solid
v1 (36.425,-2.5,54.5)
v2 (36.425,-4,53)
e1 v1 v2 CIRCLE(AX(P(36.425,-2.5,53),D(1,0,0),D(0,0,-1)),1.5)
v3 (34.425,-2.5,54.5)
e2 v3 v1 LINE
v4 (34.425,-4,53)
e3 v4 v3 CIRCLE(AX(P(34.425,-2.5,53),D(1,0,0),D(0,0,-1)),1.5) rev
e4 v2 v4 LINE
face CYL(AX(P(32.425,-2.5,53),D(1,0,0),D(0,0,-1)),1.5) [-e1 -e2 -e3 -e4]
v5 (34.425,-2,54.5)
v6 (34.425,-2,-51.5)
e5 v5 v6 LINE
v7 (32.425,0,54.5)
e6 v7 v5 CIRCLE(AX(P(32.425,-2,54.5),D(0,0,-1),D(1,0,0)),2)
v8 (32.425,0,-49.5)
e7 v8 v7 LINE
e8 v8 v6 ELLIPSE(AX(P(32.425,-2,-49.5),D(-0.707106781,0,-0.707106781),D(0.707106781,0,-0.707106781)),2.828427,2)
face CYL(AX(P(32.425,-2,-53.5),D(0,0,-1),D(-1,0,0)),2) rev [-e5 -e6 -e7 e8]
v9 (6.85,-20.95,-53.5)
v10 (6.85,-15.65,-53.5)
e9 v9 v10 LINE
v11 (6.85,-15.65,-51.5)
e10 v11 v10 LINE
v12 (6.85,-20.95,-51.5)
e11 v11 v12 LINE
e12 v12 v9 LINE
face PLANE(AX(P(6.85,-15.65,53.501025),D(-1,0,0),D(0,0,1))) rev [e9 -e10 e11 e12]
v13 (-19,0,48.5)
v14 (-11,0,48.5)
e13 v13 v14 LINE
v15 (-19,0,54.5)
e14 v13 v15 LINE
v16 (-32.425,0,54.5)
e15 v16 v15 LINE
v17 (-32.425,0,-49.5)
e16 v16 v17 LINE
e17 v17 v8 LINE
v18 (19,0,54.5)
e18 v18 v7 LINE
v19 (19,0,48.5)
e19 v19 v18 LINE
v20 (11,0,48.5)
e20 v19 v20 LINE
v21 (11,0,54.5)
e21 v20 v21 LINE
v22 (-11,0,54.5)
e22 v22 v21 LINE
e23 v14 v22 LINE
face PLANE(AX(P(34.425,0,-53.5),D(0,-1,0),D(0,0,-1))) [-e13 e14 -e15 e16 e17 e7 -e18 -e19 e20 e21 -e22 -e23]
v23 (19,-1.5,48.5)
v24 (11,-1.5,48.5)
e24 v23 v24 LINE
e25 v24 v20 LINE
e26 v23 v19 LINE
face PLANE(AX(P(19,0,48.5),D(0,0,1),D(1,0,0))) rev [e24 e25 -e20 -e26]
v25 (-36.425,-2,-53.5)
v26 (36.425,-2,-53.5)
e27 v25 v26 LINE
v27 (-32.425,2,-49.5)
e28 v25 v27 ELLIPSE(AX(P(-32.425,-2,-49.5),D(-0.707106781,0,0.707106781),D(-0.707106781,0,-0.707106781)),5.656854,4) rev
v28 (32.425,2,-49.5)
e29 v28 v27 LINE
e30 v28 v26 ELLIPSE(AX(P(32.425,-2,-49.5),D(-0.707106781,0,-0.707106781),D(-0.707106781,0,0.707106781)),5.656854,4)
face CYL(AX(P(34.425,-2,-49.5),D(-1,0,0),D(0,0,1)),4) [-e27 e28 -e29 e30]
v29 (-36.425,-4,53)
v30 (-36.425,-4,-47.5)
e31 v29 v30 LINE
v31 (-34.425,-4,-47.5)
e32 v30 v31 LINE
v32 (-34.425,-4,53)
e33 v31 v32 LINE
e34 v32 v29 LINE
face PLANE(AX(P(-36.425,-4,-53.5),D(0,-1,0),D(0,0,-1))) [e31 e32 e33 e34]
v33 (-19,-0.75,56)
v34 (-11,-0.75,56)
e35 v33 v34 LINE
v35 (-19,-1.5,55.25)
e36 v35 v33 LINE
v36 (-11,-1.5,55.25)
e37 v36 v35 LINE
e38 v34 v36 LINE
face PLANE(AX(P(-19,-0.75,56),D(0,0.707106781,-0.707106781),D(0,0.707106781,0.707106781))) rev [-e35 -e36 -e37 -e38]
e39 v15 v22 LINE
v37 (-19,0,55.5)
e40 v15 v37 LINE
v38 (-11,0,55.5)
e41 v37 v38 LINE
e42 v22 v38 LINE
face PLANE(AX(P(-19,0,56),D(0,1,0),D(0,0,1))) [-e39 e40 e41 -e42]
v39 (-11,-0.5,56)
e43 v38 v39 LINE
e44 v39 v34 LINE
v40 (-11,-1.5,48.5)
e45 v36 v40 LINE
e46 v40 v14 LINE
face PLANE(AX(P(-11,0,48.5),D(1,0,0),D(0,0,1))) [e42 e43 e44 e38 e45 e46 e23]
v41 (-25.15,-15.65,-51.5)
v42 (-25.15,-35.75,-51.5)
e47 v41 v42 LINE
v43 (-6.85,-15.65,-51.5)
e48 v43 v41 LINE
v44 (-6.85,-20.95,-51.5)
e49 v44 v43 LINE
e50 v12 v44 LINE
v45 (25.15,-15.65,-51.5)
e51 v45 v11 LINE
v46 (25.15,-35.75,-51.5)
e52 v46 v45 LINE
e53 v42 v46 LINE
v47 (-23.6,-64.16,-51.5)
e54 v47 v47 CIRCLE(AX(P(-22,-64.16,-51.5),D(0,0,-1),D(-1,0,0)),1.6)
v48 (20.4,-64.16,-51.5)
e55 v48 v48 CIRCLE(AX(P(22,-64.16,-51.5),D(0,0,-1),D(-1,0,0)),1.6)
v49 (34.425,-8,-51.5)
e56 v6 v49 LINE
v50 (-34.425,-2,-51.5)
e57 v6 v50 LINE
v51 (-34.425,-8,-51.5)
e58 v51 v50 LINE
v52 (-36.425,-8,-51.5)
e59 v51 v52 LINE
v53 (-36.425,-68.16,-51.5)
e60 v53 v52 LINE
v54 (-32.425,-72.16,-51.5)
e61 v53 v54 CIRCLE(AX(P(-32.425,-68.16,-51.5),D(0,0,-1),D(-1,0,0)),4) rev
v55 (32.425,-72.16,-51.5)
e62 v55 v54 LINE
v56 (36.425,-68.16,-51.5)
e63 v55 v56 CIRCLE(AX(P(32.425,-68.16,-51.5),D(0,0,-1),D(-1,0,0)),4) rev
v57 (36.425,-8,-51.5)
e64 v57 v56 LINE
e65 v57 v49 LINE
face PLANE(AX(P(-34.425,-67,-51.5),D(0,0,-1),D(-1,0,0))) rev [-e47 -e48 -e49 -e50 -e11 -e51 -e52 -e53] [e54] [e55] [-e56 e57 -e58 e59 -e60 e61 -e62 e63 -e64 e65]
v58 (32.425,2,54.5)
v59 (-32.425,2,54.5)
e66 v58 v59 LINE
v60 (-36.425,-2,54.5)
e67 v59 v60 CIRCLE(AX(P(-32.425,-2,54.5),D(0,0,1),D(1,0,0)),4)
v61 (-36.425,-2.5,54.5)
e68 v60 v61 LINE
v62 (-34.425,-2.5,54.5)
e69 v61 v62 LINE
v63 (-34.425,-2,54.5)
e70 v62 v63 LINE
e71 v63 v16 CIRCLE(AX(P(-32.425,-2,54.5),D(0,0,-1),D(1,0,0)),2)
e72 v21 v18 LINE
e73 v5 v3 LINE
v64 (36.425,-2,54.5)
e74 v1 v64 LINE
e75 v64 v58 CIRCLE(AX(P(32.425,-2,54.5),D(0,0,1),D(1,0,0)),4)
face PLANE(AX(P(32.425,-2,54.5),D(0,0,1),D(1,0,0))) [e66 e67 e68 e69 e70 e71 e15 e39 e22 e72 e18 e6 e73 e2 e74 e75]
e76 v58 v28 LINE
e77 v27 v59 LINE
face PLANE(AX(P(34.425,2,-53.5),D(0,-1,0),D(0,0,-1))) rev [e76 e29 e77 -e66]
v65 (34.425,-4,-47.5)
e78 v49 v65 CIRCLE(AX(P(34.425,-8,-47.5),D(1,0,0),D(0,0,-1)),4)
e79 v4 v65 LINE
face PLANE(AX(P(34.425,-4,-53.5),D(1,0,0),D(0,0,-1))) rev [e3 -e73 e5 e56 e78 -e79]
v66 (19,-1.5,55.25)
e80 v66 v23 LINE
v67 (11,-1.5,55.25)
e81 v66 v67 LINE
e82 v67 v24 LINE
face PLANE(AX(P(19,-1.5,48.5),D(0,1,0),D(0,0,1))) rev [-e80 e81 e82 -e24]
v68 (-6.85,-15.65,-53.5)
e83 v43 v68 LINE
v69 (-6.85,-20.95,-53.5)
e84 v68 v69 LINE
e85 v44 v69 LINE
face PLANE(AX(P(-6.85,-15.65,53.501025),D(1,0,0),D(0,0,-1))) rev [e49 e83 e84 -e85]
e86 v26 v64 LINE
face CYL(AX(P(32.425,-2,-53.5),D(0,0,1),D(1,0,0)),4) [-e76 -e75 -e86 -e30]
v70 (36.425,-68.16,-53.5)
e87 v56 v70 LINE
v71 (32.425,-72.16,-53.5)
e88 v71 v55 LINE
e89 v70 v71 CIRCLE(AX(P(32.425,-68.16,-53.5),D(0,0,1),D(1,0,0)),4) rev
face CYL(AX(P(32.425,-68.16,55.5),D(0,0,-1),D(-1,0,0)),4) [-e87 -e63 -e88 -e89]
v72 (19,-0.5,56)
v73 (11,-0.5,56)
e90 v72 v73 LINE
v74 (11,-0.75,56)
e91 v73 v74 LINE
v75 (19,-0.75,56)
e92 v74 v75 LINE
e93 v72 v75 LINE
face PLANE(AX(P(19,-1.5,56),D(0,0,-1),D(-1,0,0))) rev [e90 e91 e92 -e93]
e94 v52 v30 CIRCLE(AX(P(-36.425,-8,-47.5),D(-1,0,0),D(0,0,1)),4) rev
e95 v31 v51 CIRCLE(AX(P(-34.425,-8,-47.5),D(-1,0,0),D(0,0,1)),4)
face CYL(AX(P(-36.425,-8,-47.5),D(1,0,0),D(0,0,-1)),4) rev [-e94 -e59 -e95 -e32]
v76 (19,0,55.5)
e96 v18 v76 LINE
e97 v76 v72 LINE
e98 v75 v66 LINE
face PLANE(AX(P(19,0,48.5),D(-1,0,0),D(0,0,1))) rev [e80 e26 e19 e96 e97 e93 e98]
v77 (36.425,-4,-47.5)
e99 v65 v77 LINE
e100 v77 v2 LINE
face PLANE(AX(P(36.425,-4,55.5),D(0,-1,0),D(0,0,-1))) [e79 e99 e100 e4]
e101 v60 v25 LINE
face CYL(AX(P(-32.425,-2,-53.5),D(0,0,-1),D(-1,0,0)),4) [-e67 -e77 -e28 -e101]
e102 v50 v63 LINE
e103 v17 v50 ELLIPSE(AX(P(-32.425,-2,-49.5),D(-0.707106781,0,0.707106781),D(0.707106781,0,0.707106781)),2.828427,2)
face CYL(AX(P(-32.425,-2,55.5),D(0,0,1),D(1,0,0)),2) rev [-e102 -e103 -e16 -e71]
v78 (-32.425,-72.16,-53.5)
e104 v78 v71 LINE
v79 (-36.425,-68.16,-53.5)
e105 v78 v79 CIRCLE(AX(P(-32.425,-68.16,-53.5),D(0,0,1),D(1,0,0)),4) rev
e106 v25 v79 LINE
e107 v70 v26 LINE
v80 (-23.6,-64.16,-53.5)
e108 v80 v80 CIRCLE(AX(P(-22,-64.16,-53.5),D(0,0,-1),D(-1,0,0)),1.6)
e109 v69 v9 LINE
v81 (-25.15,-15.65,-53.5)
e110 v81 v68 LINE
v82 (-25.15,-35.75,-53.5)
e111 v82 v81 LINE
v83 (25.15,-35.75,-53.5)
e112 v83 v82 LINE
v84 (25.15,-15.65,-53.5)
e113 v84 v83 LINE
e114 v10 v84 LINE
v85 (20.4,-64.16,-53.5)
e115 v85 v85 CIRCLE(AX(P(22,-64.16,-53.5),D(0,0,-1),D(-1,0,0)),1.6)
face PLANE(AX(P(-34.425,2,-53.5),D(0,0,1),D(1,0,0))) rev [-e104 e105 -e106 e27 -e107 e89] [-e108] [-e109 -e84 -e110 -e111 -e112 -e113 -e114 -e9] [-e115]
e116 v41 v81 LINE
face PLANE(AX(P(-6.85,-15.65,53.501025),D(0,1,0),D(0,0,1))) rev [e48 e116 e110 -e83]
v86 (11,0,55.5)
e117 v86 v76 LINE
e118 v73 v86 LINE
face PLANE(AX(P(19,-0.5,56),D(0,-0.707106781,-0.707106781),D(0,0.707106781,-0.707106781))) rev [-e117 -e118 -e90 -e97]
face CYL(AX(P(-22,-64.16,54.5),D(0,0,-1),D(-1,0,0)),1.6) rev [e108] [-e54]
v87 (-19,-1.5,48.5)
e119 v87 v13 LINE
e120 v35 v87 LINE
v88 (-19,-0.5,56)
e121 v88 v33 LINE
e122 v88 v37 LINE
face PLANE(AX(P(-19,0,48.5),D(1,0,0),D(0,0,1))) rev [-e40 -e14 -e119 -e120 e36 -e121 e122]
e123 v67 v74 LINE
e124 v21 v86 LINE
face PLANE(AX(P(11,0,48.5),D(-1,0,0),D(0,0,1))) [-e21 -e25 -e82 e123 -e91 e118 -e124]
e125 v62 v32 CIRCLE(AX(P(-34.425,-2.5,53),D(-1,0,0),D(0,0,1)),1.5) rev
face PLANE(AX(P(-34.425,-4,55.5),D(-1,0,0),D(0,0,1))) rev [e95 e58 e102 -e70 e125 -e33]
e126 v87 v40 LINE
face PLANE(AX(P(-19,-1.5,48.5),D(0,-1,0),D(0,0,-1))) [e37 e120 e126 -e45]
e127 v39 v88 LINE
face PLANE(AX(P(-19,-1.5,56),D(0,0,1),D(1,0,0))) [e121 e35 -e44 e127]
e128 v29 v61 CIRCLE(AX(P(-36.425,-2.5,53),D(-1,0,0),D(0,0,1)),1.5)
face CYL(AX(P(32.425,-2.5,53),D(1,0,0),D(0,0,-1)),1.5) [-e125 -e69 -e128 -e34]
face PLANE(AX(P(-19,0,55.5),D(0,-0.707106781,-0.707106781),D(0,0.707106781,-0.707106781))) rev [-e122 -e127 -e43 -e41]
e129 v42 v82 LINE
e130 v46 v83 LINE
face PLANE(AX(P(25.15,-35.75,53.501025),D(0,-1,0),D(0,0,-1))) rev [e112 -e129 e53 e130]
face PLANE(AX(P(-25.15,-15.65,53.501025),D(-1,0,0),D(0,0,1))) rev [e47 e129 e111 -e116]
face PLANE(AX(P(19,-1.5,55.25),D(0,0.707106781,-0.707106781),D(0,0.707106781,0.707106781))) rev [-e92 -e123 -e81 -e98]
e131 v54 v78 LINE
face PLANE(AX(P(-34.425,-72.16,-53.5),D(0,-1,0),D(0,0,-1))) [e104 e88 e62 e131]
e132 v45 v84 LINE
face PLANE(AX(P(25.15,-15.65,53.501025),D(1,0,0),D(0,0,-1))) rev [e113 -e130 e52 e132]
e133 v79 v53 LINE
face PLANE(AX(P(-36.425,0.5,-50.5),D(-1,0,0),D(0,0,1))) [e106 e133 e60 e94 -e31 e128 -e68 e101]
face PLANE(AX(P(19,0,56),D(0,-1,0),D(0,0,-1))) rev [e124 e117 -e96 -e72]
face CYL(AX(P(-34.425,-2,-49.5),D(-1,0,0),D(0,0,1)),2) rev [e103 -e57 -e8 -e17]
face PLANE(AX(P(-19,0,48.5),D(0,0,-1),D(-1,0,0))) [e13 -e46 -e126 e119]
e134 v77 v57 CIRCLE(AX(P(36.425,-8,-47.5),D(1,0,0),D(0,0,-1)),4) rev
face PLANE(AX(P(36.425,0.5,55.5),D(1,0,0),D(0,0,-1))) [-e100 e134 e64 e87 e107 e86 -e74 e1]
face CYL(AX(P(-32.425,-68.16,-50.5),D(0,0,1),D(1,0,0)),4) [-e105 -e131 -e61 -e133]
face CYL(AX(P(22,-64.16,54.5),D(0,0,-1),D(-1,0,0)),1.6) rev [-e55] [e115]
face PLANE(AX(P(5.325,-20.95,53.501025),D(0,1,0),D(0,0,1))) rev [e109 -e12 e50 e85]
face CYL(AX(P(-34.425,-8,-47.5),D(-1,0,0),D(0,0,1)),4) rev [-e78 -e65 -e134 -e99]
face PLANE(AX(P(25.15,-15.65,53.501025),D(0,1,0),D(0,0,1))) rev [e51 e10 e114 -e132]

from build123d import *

# Parameters (mm, degrees)
SKETCH1_W                = 68.85
SKETCH1_H                = 107
BOSS_EXTRUDE1_DEPTH      = 2
SKETCH2_W                = 68.85
SKETCH2_H                = 2
BOSS_EXTRUDE2_DEPTH      = 67
CUT_EXTRUDE2_REACH       = 132.855
SKETCH5_W                = 68.85
SKETCH5_H                = 2
BOSS_EXTRUDE3_DEPTH      = 51
SKETCH6_W                = 68.85
SKETCH6_H                = 2
BOSS_EXTRUDE4_DEPTH      = 20.36
BOSS_EXTRUDE5_DEPTH      = 1.5
SKETCH13_W               = 2
SKETCH13_H               = 1.5
BOSS_EXTRUDE8_DEPTH      = 3
CUT_EXTRUDE4_REACH       = 97.75
SKETCH9_R                = 1.75
FILLET1_R                = 1.5
FILLET2_R                = 3
FILLET3_R                = 1.5
FILLET4_R                = 3
CUT_EXTRUDE5_REACH       = 111.975
SKETCH10_R               = 1.75
CHAMFER1_SIZE            = 2
SKETCH11_W               = 2
SKETCH11_H               = 109
BOSS_EXTRUDE6_DEPTH      = 4.5
SKETCH14_W               = 68.85
SKETCH14_H               = 0.5
BOSS_EXTRUDE9_DEPTH      = 2
FILLET5_R                = 2
FILLET6_R                = 4
FILLET8_R                = 4
CUT_EXTRUDE6_DEPTH       = 1
CUT_EXTRUDE7_DEPTH       = 125.986967721
SKETCH17_W               = 68.85
SKETCH17_H               = 2
BOSS_EXTRUDE10_DEPTH     = 8.66
SKETCH18_W               = 2
SKETCH18_H               = 68.16
BOSS_EXTRUDE11_DEPTH     = 2
SKETCH19_W               = 2
SKETCH19_H               = 68.16
BOSS_EXTRUDE12_DEPTH     = 2
FILLET9_R                = 4
FILLET10_R               = 4
FILLET11_R               = 1.5
BOSS_EXTRUDE13_START     = -2
BOSS_EXTRUDE13_OUTLINE_R = 1.6
BOSS_EXTRUDE13_DEPTH     = 2
BOSS_EXTRUDE14_START     = 15
SKETCH21_W               = 7.5
SKETCH21_H               = 1.5
BOSS_EXTRUDE14_DEPTH     = 4
CHAMFER2_SIZE            = 0.5
CHAMFER3_SIZE            = 0.75


# Read off the part's stored shape, not the designer's step: Boss-Extrude13
with BuildPart() as part:
    # Sketch1 → Boss-Extrude1 (new body)
    with BuildSketch(Plane(origin=(0, 0, 0), x_dir=(1, 0, 0), z_dir=(0, 1, 0))):
        Rectangle(SKETCH1_W, SKETCH1_H)
    extrude(amount=BOSS_EXTRUDE1_DEPTH)

    # Sketch2 → Boss-Extrude2 (add)
    with BuildSketch(Plane.XZ):
        with Locations((0, -52.5)):
            Rectangle(SKETCH2_W, SKETCH2_H)
    extrude(amount=BOSS_EXTRUDE2_DEPTH)

    # Sketch4 → Cut-Extrude2 (cut, up to next)
    with BuildSketch(Plane(origin=(0, 0, -53.5), x_dir=(-1, 0, 0), z_dir=(0, 0, -1)), mode=Mode.PRIVATE) as cut_extrude2_sk1:
        Polygon((-6.85, -15.65), (-6.85, -20.95), (-5.325, -20.95), (6.85, -20.95), (6.85, -15.65), (25.15, -15.65), (25.15, -35.75), (-25.15, -35.75), (-25.15, -15.65), align=None)
    cut_extrude2_tool1 = extrude(cut_extrude2_sk1.sketch, amount=-CUT_EXTRUDE2_REACH, mode=Mode.PRIVATE) & part.part
    add(cut_extrude2_tool1.solids().sort_by_distance((0, -26.272573, -53.5))[0], mode=Mode.SUBTRACT)

    # Sketch5 → Boss-Extrude3 (add)
    with BuildSketch(Plane.XY.offset(-51.5)):
        with Locations((0, -66)):
            Rectangle(SKETCH5_W, SKETCH5_H)
    extrude(amount=BOSS_EXTRUDE3_DEPTH)

    # Sketch6 → Boss-Extrude4 (add)
    with BuildSketch(Plane.XZ.offset(67)):
        with Locations((0, -1.5)):
            Rectangle(SKETCH6_W, SKETCH6_H)
    extrude(amount=BOSS_EXTRUDE4_DEPTH)

    # Sketch8 → Boss-Extrude5 (add)
    with BuildSketch(Plane(origin=(0, 2, 0), x_dir=(1, 0, 0), z_dir=(0, 1, 0))):
        Polygon((-36.425, 50.5), (-34.425, 50.5), (-34.425, -53.5), (34.425, -53.5), (34.425, 50.5), (36.425, 50.5), (36.425, -55.5), (-36.425, -55.5), align=None)
    extrude(amount=-BOSS_EXTRUDE5_DEPTH)

    # Sketch13 → Boss-Extrude8 (add)
    with BuildSketch(Plane(origin=(0, 0, -50.5), x_dir=(-1, 0, 0), z_dir=(0, 0, -1))):
        with Locations((35.425, 1.25)):
            Rectangle(SKETCH13_W, SKETCH13_H)
        with Locations((-35.425, 1.25)):
            Rectangle(SKETCH13_W, SKETCH13_H)
    extrude(amount=BOSS_EXTRUDE8_DEPTH)

    # Sketch9 → Cut-Extrude4 (cut, up to next)
    with BuildSketch(Plane.XZ.offset(67), mode=Mode.PRIVATE) as cut_extrude4_sk1:
        with Locations(Location((-25, -23.48, 0), (0, 0, 270))):
            Circle(SKETCH9_R)
    cut_extrude4_tool1 = extrude(cut_extrude4_sk1.sketch, amount=-CUT_EXTRUDE4_REACH, mode=Mode.PRIVATE) & part.part
    # Sketch9 → Cut-Extrude4 (cut, up to next)
    with BuildSketch(Plane.XZ.offset(67), mode=Mode.PRIVATE) as cut_extrude4_sk2:
        with Locations(Location((25, -23.48, 0), (0, 0, 270))):
            Circle(SKETCH9_R)
    cut_extrude4_tool2 = extrude(cut_extrude4_sk2.sketch, amount=-CUT_EXTRUDE4_REACH, mode=Mode.PRIVATE) & part.part
    add(cut_extrude4_tool1.solids().sort_by_distance((-25, -67, -23.48))[0], mode=Mode.SUBTRACT)
    add(cut_extrude4_tool2.solids().sort_by_distance((25, -67, -23.48))[0], mode=Mode.SUBTRACT)

    # Fillet1
    fillet1_edges = [part.edges().sort_by_distance(p)[0] for p in [
        (0, -67, -2.5),
    ]]
    fillet(fillet1_edges, radius=FILLET1_R)

    # Fillet2
    fillet2_edges = [part.edges().sort_by_distance(p)[0] for p in [
        (0, -65, -0.5),
    ]]
    fillet(fillet2_edges, radius=FILLET2_R)

    # Fillet3
    fillet3_edges = [part.edges().sort_by_distance(p)[0] for p in [
        (0, -65, -51.5),
    ]]
    fillet(fillet3_edges, radius=FILLET3_R)

    # Fillet4
    fillet4_edges = [part.edges().sort_by_distance(p)[0] for p in [
        (0, -67, -53.5),
    ]]
    fillet(fillet4_edges, radius=FILLET4_R)

    # Sketch10 → Cut-Extrude5 (cut, up to next)
    with BuildSketch(Plane.XY.offset(-0.5), mode=Mode.PRIVATE) as cut_extrude5_sk1:
        with Locations((-24.425, -79.36)):
            Circle(SKETCH10_R)
    cut_extrude5_tool1 = extrude(cut_extrude5_sk1.sketch, amount=-CUT_EXTRUDE5_REACH, mode=Mode.PRIVATE) & part.part
    # Sketch10 → Cut-Extrude5 (cut, up to next)
    with BuildSketch(Plane.XY.offset(-0.5), mode=Mode.PRIVATE) as cut_extrude5_sk2:
        with Locations((24.425, -79.36)):
            Circle(SKETCH10_R)
    cut_extrude5_tool2 = extrude(cut_extrude5_sk2.sketch, amount=-CUT_EXTRUDE5_REACH, mode=Mode.PRIVATE) & part.part
    add(cut_extrude5_tool1.solids().sort_by_distance((-24.425, -79.36, -0.5))[0], mode=Mode.SUBTRACT)
    add(cut_extrude5_tool2.solids().sort_by_distance((24.425, -79.36, -0.5))[0], mode=Mode.SUBTRACT)

    # Chamfer1
    chamfer1_edges = [part.edges().sort_by_distance(p)[0] for p in [
        (-34.425, -87.36, -1.5),
        (34.425, -87.36, -1.5),
    ]]
    chamfer(chamfer1_edges, length=CHAMFER1_SIZE)

    # Sketch11 → Boss-Extrude6 (add)
    with BuildSketch(Plane.XZ.offset(-0.5)):
        with Locations((35.425, 1)):
            Rectangle(SKETCH11_W, SKETCH11_H)
        with Locations((-35.425, 1)):
            Rectangle(SKETCH11_W, SKETCH11_H)
    extrude(amount=BOSS_EXTRUDE6_DEPTH)

    # Sketch14 → Boss-Extrude9 (add)
    with BuildSketch(Plane.XY.offset(53.5)):
        with Locations((0, 0.25)):
            Rectangle(SKETCH14_W, SKETCH14_H)
    extrude(amount=BOSS_EXTRUDE9_DEPTH)

    # Fillet5
    fillet5_edges = [part.edges().sort_by_distance(p)[0] for p in [
        (0, 0, -51.5),
        (34.425, 0, 2),
        (-34.425, 0, 2),
    ]]
    fillet(fillet5_edges, radius=FILLET5_R)

    # Fillet6
    fillet6_edges = [part.edges().sort_by_distance(p)[0] for p in [
        (0, 2, -53.5),
    ]]
    fillet(fillet6_edges, radius=FILLET6_R)

    # Fillet8
    # the kernel refuses this fillet: 4 mm, written as the material it takes off along each edge
    with BuildSketch(Plane(origin=(-36.425, 2, 65.5), x_dir=(1, 0, 0), z_dir=(0, 0, -1))) as fillet8_piece_1:
        with BuildLine():
            CenterArc((FILLET8_R, FILLET8_R), FILLET8_R, 180, 90)
            Line((0, FILLET8_R), (0, 0))
            Line((0, 0), (FILLET8_R, 0))
        make_face()
    extrude(amount=125, mode=Mode.SUBTRACT)
    with BuildSketch(Plane(origin=(36.425, 2, -59.5), x_dir=(0, -1, 0), z_dir=(0, 0, 1))) as fillet8_piece_2:
        with BuildLine():
            CenterArc((FILLET8_R, -FILLET8_R), FILLET8_R, 90, 90)
            Line((0, -FILLET8_R), (0, 0))
            Line((0, 0), (FILLET8_R, 0))
        make_face()
    extrude(amount=125, mode=Mode.SUBTRACT)

    # Sketch15 → Cut-Extrude6 (cut)
    with BuildSketch(Plane.XY.offset(55.5)):
        with BuildLine():
            Line((-36.425, -2), (-36.425, -4))
            Line((-36.425, -4), (-34.425, -4))
            Line((-34.425, -4), (-34.425, -2))
            ThreePointArc((-34.425, -2), (-33.839213562, -0.585786438), (-32.425, 0))
            Line((-32.425, 0), (32.425, 0))
            ThreePointArc((32.425, 0), (33.839213562, -0.585786438), (34.425, -2))
            Line((34.425, -2), (34.425, -4))
            Line((34.425, -4), (36.425, -4))
            Line((36.425, -4), (36.425, -2))
            ThreePointArc((36.425, -2), (35.253427125, 0.828427125), (32.425, 2))
            Line((32.425, 2), (-32.425, 2))
            ThreePointArc((-32.425, 2), (-35.253427125, 0.828427125), (-36.425, -2))
        make_face()
    extrude(amount=-CUT_EXTRUDE6_DEPTH, mode=Mode.SUBTRACT)

    # Sketch16 → Cut-Extrude7 (cut, through all)
    with BuildSketch(Plane(origin=(34.425, 0, 0), x_dir=(0, 0, -1), z_dir=(1, 0, 0))):
        with BuildLine():
            Line((2.5, -87.36), (0.5, -87.36))
            Line((0.5, -87.36), (0.5, -68))
            ThreePointArc((0.5, -68), (1.378679656, -65.878679656), (3.5, -65))
            Line((3.5, -65), (50, -65))
            ThreePointArc((50, -65), (51.060660172, -64.560660172), (51.5, -63.5))
            Line((51.5, -63.5), (53.5, -63.5))
            Line((53.5, -63.5), (53.5, -64))
            ThreePointArc((53.5, -64), (52.621320344, -66.121320344), (50.5, -67))
            Line((50.5, -67), (4, -67))
            ThreePointArc((4, -67), (2.939339828, -67.439339828), (2.5, -68.5))
            Line((2.5, -68.5), (2.5, -87.36))
        make_face()
    extrude(amount=-CUT_EXTRUDE7_DEPTH, mode=Mode.SUBTRACT)

    # Sketch17 → Boss-Extrude10 (add)
    with BuildSketch(Plane.XZ.offset(63.5)):
        with Locations((0, -52.5)):
            Rectangle(SKETCH17_W, SKETCH17_H)
    extrude(amount=BOSS_EXTRUDE10_DEPTH)

    # Sketch18 → Boss-Extrude11 (add)
    with BuildSketch(Plane(origin=(34.425, 0, 0), x_dir=(0, 0, -1), z_dir=(1, 0, 0))):
        with Locations((52.5, -38.08)):
            Rectangle(SKETCH18_W, SKETCH18_H)
    extrude(amount=BOSS_EXTRUDE11_DEPTH)

    # Sketch19 → Boss-Extrude12 (add)
    with BuildSketch(Plane.ZY.offset(34.425)):
        with Locations((-52.5, -38.08)):
            Rectangle(SKETCH19_W, SKETCH19_H)
    extrude(amount=BOSS_EXTRUDE12_DEPTH)

    # Fillet9
    fillet9_edges = [part.edges().sort_by_distance(p)[0] for p in [
        (36.425, -72.16, -52.5),
        (-36.425, -72.16, -52.5),
    ]]
    fillet(fillet9_edges, radius=FILLET9_R)

    # Fillet10
    fillet10_edges = [part.edges().sort_by_distance(p)[0] for p in [
        (35.425, -4, -51.5),
        (-35.425, -4, -51.5),
    ]]
    fillet(fillet10_edges, radius=FILLET10_R)

    # Fillet11
    fillet11_edges = [part.edges().sort_by_distance(p)[0] for p in [
        (35.425, -4, 54.5),
        (-35.425, -4, 54.5),
    ]]
    fillet(fillet11_edges, radius=FILLET11_R)

    # Boss-Extrude13 outline → Boss-Extrude13 (cut)
    with BuildSketch(Plane(origin=(0, 0, -53.5), x_dir=(-1, 0, 0), z_dir=(0, 0, -1)).offset(BOSS_EXTRUDE13_START)):
        with Locations((22, -64.16)):
            Circle(BOSS_EXTRUDE13_OUTLINE_R)
        with Locations((-22, -64.16)):
            Circle(BOSS_EXTRUDE13_OUTLINE_R)
    extrude(amount=BOSS_EXTRUDE13_DEPTH, mode=Mode.SUBTRACT)

    # Sketch21 → Boss-Extrude14 (add, symmetric)
    with BuildSketch(Plane(origin=(0, 0, 0), x_dir=(0, 0, -1), z_dir=(1, 0, 0)).offset(BOSS_EXTRUDE14_START)):
        with Locations((-52.25, -0.75)):
            Rectangle(SKETCH21_W, SKETCH21_H)
    boss_extrude14 = extrude(amount=BOSS_EXTRUDE14_DEPTH, both=True)

    # Mirror1: Boss-Extrude14 across plane
    add(boss_extrude14.mirror(Plane(origin=(0, 0, 0), x_dir=(0, 0, 1), z_dir=(1, 0, 0))))

    # Chamfer2
    chamfer2_edges = [part.edges().sort_by_distance(p)[0] for p in [
        (15, 0, 56),
        (-15, 0, 56),
    ]]
    chamfer(chamfer2_edges, length=CHAMFER2_SIZE)

    # Chamfer3
    chamfer3_edges = [part.edges().sort_by_distance(p)[0] for p in [
        (15, -1.5, 56),
        (-15, -1.5, 56),
    ]]
    chamfer(chamfer3_edges, length=CHAMFER3_SIZE)


solid = part.part
